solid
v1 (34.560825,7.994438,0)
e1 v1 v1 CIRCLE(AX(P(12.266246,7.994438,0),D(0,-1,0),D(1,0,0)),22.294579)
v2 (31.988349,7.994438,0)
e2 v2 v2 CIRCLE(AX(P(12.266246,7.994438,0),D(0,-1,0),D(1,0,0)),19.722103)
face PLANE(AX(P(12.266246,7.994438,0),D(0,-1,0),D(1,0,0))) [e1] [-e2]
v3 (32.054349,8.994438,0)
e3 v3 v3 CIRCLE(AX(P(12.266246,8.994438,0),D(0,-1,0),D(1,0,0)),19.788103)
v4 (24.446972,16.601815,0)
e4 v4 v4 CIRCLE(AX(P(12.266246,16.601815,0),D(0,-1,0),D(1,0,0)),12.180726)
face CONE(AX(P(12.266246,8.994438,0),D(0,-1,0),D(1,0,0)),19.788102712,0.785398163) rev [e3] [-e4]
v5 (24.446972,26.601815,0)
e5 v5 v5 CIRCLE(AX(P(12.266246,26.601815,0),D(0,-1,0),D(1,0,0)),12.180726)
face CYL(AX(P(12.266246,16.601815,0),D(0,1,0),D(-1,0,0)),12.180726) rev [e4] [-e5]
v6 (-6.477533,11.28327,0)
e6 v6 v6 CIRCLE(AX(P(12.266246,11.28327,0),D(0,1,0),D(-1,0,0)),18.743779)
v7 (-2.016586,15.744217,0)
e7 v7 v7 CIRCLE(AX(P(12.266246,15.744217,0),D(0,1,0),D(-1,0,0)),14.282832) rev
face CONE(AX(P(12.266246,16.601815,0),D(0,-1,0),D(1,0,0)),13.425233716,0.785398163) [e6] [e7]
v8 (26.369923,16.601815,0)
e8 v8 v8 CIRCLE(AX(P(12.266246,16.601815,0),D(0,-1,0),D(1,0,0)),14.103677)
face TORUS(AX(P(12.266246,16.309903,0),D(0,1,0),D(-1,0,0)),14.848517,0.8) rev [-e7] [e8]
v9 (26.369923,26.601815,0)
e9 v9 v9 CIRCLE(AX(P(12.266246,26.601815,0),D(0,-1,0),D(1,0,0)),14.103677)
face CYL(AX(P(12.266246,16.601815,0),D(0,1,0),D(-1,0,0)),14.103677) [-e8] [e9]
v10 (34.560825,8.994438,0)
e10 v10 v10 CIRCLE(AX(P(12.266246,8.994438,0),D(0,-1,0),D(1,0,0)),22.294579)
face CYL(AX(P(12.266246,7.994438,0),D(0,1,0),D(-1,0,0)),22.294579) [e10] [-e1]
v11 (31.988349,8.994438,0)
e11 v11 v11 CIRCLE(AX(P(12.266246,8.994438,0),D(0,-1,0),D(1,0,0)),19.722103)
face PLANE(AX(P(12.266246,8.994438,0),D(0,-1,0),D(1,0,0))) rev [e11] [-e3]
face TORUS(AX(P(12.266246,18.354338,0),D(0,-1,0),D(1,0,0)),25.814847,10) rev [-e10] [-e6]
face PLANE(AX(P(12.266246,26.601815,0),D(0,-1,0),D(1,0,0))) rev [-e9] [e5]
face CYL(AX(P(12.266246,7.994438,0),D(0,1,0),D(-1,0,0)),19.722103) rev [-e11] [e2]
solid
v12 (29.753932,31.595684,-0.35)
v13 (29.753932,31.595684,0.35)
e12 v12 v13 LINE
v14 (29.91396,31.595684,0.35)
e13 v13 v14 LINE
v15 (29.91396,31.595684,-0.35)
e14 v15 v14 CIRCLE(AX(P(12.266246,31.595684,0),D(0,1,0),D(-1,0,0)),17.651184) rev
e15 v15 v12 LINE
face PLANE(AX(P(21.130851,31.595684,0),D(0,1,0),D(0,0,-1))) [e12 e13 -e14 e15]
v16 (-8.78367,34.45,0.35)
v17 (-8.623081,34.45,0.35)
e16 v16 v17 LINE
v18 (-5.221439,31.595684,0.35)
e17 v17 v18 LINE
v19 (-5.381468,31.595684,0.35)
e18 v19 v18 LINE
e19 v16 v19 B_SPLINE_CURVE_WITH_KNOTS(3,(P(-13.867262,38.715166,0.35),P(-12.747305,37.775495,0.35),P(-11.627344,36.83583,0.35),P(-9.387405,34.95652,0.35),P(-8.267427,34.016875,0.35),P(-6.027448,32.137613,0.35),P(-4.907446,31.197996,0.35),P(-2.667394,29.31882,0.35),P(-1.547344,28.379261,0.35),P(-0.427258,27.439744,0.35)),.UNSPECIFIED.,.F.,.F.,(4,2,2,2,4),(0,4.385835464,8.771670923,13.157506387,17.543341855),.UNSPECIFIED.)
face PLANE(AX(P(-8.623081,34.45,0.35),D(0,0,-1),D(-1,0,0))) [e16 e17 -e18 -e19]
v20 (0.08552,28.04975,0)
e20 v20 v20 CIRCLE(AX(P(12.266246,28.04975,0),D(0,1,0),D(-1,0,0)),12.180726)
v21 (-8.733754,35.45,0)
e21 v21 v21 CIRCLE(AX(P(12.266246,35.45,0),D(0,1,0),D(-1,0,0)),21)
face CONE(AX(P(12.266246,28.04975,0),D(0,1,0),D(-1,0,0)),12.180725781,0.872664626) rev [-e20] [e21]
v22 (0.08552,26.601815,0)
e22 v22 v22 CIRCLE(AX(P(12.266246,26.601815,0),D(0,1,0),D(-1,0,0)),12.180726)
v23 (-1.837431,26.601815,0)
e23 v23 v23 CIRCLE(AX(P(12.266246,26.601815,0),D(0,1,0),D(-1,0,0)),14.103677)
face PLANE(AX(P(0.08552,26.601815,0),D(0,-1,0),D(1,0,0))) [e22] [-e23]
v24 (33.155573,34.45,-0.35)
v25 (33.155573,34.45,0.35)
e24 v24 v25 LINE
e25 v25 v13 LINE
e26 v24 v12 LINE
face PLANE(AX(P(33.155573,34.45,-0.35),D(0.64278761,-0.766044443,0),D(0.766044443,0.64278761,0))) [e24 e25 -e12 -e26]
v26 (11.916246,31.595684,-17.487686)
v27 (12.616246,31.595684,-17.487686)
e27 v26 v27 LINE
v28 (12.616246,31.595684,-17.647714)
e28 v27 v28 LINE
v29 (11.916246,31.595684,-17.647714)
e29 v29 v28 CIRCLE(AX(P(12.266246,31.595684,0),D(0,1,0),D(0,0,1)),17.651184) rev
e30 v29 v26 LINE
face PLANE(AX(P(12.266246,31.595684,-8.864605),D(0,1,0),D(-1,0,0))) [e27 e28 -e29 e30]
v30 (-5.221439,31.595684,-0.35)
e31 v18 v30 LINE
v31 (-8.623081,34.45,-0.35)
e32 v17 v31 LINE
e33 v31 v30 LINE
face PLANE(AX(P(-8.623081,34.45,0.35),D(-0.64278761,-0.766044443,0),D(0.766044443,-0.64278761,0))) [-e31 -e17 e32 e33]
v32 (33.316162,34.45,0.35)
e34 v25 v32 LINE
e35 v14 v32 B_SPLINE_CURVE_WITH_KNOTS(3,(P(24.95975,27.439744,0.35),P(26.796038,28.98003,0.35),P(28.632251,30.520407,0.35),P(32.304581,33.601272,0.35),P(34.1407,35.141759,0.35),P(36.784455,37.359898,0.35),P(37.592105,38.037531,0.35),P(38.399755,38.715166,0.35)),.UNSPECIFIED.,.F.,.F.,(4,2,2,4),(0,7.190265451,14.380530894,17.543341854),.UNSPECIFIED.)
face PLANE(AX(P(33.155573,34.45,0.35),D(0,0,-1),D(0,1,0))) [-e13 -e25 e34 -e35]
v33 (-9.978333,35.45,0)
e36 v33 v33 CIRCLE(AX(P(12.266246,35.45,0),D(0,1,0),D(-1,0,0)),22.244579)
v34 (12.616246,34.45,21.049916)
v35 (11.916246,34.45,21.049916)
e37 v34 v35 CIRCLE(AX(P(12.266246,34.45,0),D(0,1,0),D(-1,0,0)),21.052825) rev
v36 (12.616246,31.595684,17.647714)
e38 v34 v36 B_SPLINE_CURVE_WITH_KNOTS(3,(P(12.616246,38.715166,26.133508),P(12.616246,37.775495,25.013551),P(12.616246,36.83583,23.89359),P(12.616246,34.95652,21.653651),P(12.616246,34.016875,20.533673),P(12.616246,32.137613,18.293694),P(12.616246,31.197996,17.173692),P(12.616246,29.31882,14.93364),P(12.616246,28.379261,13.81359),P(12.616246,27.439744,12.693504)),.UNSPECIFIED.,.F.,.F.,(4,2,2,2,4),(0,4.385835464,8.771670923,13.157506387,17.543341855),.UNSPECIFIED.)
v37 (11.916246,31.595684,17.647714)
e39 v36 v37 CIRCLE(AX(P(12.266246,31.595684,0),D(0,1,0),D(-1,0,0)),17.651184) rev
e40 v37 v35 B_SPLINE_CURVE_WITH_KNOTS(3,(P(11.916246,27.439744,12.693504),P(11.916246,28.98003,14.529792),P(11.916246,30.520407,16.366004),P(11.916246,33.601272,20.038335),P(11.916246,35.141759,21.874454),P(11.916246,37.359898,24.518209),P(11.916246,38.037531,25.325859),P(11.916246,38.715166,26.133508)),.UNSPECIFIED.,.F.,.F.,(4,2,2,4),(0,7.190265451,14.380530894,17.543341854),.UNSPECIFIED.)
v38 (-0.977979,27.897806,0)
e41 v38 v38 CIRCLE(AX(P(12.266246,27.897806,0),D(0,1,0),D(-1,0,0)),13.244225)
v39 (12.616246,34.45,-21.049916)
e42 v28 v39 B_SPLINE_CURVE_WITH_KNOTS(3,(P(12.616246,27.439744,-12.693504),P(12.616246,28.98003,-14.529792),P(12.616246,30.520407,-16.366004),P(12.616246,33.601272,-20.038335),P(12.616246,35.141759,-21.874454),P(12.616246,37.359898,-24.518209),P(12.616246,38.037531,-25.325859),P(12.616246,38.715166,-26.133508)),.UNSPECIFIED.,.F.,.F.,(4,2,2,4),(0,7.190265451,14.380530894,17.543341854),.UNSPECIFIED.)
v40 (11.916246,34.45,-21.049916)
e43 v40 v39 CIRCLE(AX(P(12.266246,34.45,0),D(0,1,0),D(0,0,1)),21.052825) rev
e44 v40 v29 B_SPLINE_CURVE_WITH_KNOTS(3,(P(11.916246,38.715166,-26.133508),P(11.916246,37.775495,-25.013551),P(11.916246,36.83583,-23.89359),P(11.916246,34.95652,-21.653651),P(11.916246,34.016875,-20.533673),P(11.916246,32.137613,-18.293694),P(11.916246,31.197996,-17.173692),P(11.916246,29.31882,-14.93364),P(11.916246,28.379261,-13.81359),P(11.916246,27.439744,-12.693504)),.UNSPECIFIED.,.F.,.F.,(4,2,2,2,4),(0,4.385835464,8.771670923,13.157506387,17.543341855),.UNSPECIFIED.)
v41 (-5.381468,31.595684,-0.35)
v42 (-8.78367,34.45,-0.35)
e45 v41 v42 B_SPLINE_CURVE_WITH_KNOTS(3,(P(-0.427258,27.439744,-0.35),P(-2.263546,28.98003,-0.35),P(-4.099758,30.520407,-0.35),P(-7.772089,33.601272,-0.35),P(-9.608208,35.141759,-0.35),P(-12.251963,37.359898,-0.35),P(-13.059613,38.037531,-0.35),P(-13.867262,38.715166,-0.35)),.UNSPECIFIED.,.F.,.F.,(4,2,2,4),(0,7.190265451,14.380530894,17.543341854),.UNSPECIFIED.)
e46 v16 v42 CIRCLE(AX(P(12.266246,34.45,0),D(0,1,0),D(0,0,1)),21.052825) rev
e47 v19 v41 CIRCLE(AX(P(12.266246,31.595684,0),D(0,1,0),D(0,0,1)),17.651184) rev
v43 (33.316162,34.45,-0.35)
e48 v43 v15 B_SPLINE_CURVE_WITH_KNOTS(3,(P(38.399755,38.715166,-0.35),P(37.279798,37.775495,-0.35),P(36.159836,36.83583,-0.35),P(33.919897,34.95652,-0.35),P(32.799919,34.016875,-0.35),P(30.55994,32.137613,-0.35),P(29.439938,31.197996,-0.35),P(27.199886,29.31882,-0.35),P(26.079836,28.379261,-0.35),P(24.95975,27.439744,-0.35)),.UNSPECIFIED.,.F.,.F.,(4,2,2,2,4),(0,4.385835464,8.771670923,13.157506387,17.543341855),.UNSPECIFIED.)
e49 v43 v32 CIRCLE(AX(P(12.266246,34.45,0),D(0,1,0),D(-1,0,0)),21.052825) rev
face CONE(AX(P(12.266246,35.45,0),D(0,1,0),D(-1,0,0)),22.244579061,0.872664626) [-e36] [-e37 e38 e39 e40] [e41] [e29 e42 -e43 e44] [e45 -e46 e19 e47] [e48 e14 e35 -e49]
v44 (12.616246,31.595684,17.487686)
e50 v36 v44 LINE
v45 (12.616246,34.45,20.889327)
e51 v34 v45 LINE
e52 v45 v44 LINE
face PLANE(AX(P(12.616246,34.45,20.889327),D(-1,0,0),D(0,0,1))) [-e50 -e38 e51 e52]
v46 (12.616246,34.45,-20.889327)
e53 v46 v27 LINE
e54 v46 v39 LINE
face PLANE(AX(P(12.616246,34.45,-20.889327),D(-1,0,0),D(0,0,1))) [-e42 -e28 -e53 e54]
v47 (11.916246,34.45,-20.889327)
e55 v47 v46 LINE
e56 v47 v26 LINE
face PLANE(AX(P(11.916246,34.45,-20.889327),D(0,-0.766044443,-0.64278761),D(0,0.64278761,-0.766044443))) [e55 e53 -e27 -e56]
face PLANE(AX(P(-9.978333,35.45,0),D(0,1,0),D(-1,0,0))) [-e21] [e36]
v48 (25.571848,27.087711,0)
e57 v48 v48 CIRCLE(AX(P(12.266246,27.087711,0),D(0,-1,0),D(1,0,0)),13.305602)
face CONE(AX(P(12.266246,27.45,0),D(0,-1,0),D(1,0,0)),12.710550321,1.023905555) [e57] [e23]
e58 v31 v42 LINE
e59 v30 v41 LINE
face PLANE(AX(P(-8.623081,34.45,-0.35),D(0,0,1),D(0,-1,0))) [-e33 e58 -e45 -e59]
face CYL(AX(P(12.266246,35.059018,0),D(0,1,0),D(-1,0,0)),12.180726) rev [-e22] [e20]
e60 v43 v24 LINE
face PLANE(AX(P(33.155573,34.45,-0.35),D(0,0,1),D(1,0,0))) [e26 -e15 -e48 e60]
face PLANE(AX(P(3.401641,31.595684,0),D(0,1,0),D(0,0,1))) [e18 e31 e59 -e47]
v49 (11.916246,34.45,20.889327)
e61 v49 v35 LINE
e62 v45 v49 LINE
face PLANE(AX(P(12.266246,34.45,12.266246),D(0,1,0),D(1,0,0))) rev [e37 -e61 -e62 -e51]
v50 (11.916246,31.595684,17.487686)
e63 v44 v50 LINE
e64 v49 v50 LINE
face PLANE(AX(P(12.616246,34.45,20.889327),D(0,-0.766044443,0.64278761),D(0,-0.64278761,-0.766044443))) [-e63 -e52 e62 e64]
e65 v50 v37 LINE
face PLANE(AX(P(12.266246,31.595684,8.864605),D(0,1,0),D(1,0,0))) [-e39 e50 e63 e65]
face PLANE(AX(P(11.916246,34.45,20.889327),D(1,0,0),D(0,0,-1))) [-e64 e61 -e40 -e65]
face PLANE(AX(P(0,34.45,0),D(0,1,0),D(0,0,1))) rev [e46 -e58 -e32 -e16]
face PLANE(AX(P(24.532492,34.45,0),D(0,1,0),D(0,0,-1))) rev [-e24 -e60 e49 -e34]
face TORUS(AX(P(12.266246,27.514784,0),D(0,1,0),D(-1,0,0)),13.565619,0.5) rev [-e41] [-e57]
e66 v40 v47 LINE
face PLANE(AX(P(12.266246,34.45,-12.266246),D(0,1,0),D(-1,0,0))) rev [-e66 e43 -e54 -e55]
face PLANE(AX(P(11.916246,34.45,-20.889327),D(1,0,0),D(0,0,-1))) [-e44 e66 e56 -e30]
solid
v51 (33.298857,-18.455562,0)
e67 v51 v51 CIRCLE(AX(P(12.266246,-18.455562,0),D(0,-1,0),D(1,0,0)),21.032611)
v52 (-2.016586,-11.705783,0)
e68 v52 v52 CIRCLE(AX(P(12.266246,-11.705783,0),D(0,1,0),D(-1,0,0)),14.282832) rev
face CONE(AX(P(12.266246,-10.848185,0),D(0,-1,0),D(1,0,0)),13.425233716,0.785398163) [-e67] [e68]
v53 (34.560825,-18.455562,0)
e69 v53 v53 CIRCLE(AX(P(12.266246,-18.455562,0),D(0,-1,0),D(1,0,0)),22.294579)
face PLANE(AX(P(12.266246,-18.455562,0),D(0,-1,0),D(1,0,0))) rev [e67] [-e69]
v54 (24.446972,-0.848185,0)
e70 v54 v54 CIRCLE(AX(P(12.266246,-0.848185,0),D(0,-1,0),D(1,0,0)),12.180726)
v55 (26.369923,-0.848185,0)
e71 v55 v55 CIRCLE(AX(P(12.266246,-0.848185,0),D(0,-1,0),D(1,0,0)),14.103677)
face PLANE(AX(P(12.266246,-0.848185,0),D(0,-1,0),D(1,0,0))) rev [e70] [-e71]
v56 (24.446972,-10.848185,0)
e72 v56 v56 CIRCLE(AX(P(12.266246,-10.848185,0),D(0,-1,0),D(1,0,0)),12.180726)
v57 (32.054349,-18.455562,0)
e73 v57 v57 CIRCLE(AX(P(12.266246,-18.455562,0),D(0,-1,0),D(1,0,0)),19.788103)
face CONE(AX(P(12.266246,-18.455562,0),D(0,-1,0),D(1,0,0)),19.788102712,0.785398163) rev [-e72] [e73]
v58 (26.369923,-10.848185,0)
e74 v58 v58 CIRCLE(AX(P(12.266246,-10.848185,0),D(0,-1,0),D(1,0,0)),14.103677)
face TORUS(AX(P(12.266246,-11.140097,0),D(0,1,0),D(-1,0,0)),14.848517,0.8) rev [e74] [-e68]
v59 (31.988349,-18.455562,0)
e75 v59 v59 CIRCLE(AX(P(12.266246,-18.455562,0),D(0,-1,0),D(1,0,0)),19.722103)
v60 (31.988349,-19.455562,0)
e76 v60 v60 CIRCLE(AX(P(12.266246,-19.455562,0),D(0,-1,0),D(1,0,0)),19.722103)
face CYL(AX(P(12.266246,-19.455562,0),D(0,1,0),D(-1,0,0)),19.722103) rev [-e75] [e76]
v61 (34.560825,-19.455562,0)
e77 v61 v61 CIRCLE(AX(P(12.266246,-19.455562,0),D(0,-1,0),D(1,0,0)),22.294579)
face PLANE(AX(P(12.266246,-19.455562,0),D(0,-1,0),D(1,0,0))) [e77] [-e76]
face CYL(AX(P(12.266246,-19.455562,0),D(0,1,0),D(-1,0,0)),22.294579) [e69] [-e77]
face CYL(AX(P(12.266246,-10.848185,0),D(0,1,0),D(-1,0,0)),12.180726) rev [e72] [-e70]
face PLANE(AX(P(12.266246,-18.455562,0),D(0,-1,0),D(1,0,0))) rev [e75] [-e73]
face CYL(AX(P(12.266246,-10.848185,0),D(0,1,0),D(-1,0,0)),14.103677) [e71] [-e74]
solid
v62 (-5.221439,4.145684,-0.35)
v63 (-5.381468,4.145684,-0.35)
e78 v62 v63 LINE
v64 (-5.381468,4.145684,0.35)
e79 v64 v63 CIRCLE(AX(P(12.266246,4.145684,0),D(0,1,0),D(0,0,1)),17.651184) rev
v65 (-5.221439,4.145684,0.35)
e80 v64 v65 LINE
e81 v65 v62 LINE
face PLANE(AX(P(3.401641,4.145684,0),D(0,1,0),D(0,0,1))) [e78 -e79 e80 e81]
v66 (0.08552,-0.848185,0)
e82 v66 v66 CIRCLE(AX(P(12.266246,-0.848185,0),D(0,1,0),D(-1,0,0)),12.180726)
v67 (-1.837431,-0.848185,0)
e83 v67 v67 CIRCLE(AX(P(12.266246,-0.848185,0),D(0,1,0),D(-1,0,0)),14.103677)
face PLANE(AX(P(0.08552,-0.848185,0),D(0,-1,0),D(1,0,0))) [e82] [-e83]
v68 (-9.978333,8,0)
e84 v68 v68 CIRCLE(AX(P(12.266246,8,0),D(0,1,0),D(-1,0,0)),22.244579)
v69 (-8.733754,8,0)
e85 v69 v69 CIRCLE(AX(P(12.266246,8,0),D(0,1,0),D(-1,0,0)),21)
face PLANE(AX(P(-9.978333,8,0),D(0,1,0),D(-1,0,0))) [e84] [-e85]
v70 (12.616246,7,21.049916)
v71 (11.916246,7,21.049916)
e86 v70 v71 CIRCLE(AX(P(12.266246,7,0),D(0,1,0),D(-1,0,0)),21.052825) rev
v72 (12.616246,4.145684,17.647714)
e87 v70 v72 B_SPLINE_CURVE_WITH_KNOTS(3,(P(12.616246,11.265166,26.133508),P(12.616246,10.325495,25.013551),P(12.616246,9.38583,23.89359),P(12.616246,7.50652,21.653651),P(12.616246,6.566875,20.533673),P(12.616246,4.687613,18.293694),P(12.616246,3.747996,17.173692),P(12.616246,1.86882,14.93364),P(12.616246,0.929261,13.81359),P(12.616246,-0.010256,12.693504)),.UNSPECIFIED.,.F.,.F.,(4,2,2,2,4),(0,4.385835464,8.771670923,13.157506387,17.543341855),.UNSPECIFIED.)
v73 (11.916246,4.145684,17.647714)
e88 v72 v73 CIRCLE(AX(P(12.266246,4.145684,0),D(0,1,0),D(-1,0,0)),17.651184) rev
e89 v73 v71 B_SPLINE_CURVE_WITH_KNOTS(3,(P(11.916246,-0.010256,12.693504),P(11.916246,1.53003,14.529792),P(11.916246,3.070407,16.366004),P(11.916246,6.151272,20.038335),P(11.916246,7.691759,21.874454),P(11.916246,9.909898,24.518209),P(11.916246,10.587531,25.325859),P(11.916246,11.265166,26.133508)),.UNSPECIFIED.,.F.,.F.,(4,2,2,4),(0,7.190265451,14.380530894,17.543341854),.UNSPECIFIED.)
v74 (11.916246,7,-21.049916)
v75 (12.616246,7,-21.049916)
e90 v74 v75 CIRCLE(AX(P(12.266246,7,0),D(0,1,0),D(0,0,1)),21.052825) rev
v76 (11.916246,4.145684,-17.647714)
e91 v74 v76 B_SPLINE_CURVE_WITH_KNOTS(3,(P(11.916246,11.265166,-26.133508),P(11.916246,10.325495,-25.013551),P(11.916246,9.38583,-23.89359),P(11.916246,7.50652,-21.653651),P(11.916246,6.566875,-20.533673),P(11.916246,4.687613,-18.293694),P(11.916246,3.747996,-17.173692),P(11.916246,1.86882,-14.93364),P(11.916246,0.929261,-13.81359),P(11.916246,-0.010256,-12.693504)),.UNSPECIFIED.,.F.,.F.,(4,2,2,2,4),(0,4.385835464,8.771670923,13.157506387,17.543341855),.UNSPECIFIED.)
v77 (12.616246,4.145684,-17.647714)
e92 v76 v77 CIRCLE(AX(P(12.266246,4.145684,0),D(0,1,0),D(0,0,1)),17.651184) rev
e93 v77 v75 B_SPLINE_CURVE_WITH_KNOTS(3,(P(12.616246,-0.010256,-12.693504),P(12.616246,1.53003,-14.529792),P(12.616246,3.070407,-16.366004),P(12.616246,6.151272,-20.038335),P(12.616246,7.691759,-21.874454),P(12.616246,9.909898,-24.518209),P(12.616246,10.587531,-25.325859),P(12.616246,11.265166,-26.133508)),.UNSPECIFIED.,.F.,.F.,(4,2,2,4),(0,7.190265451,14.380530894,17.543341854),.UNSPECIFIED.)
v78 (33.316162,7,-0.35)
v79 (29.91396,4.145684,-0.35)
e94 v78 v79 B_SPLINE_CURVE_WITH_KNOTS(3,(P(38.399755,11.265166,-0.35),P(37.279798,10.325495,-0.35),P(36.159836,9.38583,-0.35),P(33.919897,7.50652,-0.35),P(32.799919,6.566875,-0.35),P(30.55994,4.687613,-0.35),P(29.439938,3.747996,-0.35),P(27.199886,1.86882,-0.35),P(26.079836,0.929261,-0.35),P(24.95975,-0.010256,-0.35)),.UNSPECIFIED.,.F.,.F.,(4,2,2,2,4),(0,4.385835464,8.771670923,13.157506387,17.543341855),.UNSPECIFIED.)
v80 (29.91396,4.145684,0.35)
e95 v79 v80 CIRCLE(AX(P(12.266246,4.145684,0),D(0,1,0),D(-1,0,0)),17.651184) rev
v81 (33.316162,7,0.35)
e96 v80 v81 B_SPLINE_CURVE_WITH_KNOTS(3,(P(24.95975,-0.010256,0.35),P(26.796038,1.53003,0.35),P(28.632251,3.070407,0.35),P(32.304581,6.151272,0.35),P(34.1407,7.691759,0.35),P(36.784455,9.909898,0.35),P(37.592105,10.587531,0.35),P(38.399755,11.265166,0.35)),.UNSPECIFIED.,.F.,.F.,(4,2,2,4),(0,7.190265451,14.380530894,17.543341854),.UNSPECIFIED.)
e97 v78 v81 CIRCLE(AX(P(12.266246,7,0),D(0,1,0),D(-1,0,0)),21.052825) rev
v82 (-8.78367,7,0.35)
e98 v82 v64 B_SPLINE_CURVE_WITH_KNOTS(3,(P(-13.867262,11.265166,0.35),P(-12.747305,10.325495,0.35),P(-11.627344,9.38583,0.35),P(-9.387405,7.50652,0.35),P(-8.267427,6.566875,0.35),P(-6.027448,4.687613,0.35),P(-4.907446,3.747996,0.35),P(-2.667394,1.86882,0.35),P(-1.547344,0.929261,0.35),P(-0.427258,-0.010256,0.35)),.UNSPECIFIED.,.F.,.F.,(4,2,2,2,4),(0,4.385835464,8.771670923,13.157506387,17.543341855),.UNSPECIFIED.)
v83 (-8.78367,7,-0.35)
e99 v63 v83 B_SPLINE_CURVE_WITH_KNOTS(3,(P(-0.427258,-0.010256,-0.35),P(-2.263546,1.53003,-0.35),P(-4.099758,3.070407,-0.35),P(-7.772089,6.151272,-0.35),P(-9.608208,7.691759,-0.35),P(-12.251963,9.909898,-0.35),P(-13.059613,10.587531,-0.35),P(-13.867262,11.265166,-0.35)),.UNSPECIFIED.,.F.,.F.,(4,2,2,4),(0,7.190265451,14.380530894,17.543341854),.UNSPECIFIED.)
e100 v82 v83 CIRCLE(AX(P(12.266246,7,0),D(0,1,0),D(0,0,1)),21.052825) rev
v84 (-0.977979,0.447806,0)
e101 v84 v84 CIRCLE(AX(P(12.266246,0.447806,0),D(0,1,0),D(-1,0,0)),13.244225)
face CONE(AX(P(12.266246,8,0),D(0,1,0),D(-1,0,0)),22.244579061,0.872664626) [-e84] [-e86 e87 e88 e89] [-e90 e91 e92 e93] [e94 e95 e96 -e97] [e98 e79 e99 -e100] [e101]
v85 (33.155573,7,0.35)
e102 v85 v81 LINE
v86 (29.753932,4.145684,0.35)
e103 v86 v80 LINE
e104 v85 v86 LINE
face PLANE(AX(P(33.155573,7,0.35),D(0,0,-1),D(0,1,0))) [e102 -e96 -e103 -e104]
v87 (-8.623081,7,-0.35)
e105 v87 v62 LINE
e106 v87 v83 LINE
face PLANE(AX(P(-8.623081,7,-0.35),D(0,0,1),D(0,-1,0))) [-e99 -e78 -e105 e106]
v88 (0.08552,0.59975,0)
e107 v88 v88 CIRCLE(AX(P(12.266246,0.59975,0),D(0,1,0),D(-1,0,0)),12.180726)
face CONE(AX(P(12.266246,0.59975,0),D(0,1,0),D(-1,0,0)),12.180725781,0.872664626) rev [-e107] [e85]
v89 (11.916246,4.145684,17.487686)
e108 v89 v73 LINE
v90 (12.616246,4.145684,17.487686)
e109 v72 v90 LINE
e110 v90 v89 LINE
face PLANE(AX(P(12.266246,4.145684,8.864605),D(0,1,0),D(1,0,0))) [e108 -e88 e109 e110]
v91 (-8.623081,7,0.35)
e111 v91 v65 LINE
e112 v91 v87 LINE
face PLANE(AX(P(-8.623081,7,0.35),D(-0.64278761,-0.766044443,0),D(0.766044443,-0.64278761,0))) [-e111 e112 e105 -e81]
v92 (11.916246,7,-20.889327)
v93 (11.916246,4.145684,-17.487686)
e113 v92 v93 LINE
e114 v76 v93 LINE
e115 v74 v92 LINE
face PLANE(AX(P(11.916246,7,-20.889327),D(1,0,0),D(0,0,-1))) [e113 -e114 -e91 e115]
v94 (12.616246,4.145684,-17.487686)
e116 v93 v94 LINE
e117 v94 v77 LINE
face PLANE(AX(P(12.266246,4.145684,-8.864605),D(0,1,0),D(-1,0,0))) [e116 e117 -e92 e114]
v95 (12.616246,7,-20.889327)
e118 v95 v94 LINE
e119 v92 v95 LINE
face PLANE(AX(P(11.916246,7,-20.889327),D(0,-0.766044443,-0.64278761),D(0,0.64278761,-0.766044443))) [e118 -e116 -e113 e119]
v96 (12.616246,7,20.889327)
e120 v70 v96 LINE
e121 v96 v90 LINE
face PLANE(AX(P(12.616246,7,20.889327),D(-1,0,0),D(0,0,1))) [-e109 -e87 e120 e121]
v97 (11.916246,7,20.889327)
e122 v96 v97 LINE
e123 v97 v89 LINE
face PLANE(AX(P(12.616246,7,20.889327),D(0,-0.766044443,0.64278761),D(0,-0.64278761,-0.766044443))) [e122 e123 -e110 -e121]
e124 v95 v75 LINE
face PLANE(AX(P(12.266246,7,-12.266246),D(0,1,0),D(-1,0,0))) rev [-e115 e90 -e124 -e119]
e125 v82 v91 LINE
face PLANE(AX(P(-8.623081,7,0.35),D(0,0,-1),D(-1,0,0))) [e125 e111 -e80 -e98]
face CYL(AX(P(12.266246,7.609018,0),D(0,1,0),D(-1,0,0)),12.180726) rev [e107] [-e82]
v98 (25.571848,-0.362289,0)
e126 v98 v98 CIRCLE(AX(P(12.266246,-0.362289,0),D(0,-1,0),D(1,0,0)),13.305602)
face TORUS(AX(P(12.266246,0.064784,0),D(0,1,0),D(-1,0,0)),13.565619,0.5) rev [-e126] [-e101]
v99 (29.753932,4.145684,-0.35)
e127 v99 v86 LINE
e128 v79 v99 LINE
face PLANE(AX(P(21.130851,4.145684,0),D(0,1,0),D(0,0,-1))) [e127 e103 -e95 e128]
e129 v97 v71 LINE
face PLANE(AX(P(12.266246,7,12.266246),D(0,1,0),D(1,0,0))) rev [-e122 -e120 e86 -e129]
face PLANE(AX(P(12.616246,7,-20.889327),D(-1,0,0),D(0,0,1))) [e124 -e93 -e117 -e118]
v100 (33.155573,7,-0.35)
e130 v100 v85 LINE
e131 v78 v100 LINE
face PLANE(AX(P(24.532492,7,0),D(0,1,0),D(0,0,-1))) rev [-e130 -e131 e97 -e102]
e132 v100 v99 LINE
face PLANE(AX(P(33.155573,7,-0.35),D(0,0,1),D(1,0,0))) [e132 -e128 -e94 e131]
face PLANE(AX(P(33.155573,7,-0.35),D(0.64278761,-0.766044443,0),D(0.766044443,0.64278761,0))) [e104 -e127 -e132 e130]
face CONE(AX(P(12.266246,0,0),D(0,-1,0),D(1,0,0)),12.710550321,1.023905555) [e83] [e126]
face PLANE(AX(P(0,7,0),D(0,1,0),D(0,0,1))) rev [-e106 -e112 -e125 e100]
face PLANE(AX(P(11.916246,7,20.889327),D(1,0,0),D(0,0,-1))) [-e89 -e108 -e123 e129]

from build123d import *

# Parameters (mm, degrees)
ACTIVE_FILLET_R     = 0.5
SKETCH11_R          = 14.103676921920666
SKETCH11_R_2        = 12.180725781348816
COLLAR_DEPTH        = 10
PASSIVE_FILLET_R    = 0.8
SKETCH15_R          = 22.29457906148835
SKETCH15_R_2        = 19.722102711916126
BOSS_EXTRUDE2_DEPTH = 1
CIRPATTERN1_COUNT   = 4
FILLET1_R           = 10


with BuildPart() as part:
    # Sketch1 → Main Active (revolve)
    with BuildSketch(Plane.XY):
        Polygon((-0.44430417046757187, 0), (-9.97833291122136, 8), (-8.733753849733018, 8), (0.08552036891816808, 0.5997502558785777), (0.08552036891816808, -0.8481847341285212), (-1.8374307716536824, -0.8481847341285211), align=None)
    revolve(axis=Axis((12.266246150266982, 7.609018032819944, 0), (1.1e-16, -1, 0)))

    # Active fillet
    active_fillet_edges = [part.edges().sort_by_distance(p)[0] for p in [
        (24.976796471001535, 3.23e-15, -1.56e-15),
    ]]
    fillet(active_fillet_edges, radius=ACTIVE_FILLET_R)

    # Cut-Sweep2: sweep along a path in Sketch19
    with BuildLine(Plane(origin=(-0.18357578046802644, -0.2187770958860591, 2e-17), x_dir=(-0.7660444431189819, 0.6427876096865347, 0), z_dir=(-0.6427876096865347, -0.7660444431189819, 0))) as cut_sweep2_path:
        Line((11.230423528864234, 1.22e-15), (6.789896246932316, 1.18e-15))
    # Sketch18 → Cut-Sweep2 (sweep, cut)
    with BuildSketch(Plane(origin=(-8e-16, 7.000000000000001, 0), x_dir=(1, 1.1e-16, 0), z_dir=(-1.1e-16, 1, 0))):
        Polygon((-8.62308060460278, -0.35), (-9.07308060460278, -0.34999999999999987), (-9.07308060460278, 0.34999999999999987), (-8.62308060460278, 0.35), align=None)
    cut_sweep2 = sweep(path=cut_sweep2_path.line, mode=Mode.SUBTRACT)

    # CirPattern1: Cut-Sweep2 ×4 about axis
    cirpattern1_axis = Axis((12.266246150266984, 0, -2.694e-14), (0, 1, 0))
    for i in range(1, CIRPATTERN1_COUNT):
        add(cut_sweep2.rotate(cirpattern1_axis, i * 360 / CIRPATTERN1_COUNT), mode=Mode.SUBTRACT)


with BuildPart() as body_2:
    # Sketch11 → collar (new body)
    with BuildSketch(Plane.XZ.offset(0.848184734128521)):
        with Locations((12.266246150266984, 0)):
            Circle(SKETCH11_R)
        with Locations((12.266246150266984, 0)):
            Circle(SKETCH11_R_2, mode=Mode.SUBTRACT)
    extrude(amount=COLLAR_DEPTH)

    # Sketch14 → Passive Element (revolve)
    with BuildSketch(Plane.XY, mode=Mode.PRIVATE) as passive_element_sk:
        Polygon((-1.1589875659701498, -10.848184734128521), (-8.766364496537454, -18.455561664695857), (-7.521856561649136, -18.45556166469586), (0.08552036891816897, -10.848184734128521), align=None)
    revolve(passive_element_sk.sketch.rotate(Axis((12.266246150266984, -19.969844330252183, 0), (-1.2e-16, 1, 0)), 180), axis=Axis((12.266246150266984, -19.969844330252183, 0), (-1.2e-16, 1, 0)))

    # Passive Fillet
    # the kernel refuses this fillet: 0.8 mm, written as the material it adds along each edge
    with BuildSketch(Plane(origin=(12.266246150266982, -10.84818473412852, 0), x_dir=(1, 1.3e-16, 1.2e-16), z_dir=(-1.2e-16, 0, 1))) as passive_fillet_piece_1:
        with BuildLine():
            CenterArc((14.848517187625331, -0.2919126214897238), PASSIVE_FILLET_R, 158.5991389184753, 66.40086108152457)
            Line((14.282831762676091, -0.8575980464389606), (14.271518054177106, -0.8689117549379458))
            Line((14.271518054177106, -0.8689117549379458), (13.413920007738147, -0.01131370849898516))
            Line((13.413920007738147, -0.01131370849898516), (13.425233716237132, 0.01600000000000001))
            ThreePointArc((13.425233716237132, 0.01600000000000001), (13.764455319078897, 0.01599999999999997), (14.08878011660657, 0.00583825242979499))
            Line((14.08878011660657, 0.00583825242979499), (14.103676921920664, -9e-17))
        make_face()
    revolve(axis=Axis((12.266246150266982, -10.84818473412852, 0), (-1.2e-16, 1, 0)))

    # Sketch15 → Boss-Extrude2 (add)
    with BuildSketch(Plane.XZ.offset(18.455561664695857)):
        with Locations((12.266246150266984, 0)):
            Circle(SKETCH15_R)
        with Locations((12.266246150266984, 0)):
            Circle(SKETCH15_R_2, mode=Mode.SUBTRACT)
    extrude(amount=BOSS_EXTRUDE2_DEPTH)


with BuildPart() as body_3:
    # Body-Move/Copy2: read off the stored shape, not the designer's step
    # Body-Move/Copy2: copy of body 2
    add(body_2.part.moved(Location((0, 27.45, 0))))

    # Fillet1
    # the kernel refuses this fillet: 10 mm, written as the material it adds along each edge
    with BuildSketch(Plane(origin=(12.266246150266984, 8.994438335304146, 0), x_dir=(1, 1.7e-16, 1.2e-16), z_dir=(-1.2e-16, 0, 1))) as fillet1_piece_1:
        with BuildLine():
            CenterArc((25.81484706108966, 9.359899209445736), FILLET1_R, 224.9999999999999, 24.388666535893208)
            Line((18.743779249224175, 2.2888313975802714), (18.602357892986863, 2.147410041342962))
            Line((18.602357892986863, 2.147410041342962), (20.89118929056713, -0.14142135623731097))
            Line((20.89118929056713, -0.14142135623731097), (21.03261064680444, -0.20000000000000107))
            ThreePointArc((21.03261064680444, -0.20000000000000107), (21.663594854146393, -0.20000000000000118), (22.224173701496323, -0.1871979841889184))
            Line((22.224173701496323, -0.1871979841889184), (22.294579061488346, -3.77e-15))
        make_face()
    revolve(axis=Axis((12.266246150266984, 8.994438335304146, 0), (-1.2e-16, 1, 0)))


with BuildPart() as body_4:
    # Body-Move_Copy2 2: copy of part
    add(part.part.moved(Location((0, 27.45, 0))))


solid = Compound([part.part, body_2.part, body_3.part, body_4.part])
